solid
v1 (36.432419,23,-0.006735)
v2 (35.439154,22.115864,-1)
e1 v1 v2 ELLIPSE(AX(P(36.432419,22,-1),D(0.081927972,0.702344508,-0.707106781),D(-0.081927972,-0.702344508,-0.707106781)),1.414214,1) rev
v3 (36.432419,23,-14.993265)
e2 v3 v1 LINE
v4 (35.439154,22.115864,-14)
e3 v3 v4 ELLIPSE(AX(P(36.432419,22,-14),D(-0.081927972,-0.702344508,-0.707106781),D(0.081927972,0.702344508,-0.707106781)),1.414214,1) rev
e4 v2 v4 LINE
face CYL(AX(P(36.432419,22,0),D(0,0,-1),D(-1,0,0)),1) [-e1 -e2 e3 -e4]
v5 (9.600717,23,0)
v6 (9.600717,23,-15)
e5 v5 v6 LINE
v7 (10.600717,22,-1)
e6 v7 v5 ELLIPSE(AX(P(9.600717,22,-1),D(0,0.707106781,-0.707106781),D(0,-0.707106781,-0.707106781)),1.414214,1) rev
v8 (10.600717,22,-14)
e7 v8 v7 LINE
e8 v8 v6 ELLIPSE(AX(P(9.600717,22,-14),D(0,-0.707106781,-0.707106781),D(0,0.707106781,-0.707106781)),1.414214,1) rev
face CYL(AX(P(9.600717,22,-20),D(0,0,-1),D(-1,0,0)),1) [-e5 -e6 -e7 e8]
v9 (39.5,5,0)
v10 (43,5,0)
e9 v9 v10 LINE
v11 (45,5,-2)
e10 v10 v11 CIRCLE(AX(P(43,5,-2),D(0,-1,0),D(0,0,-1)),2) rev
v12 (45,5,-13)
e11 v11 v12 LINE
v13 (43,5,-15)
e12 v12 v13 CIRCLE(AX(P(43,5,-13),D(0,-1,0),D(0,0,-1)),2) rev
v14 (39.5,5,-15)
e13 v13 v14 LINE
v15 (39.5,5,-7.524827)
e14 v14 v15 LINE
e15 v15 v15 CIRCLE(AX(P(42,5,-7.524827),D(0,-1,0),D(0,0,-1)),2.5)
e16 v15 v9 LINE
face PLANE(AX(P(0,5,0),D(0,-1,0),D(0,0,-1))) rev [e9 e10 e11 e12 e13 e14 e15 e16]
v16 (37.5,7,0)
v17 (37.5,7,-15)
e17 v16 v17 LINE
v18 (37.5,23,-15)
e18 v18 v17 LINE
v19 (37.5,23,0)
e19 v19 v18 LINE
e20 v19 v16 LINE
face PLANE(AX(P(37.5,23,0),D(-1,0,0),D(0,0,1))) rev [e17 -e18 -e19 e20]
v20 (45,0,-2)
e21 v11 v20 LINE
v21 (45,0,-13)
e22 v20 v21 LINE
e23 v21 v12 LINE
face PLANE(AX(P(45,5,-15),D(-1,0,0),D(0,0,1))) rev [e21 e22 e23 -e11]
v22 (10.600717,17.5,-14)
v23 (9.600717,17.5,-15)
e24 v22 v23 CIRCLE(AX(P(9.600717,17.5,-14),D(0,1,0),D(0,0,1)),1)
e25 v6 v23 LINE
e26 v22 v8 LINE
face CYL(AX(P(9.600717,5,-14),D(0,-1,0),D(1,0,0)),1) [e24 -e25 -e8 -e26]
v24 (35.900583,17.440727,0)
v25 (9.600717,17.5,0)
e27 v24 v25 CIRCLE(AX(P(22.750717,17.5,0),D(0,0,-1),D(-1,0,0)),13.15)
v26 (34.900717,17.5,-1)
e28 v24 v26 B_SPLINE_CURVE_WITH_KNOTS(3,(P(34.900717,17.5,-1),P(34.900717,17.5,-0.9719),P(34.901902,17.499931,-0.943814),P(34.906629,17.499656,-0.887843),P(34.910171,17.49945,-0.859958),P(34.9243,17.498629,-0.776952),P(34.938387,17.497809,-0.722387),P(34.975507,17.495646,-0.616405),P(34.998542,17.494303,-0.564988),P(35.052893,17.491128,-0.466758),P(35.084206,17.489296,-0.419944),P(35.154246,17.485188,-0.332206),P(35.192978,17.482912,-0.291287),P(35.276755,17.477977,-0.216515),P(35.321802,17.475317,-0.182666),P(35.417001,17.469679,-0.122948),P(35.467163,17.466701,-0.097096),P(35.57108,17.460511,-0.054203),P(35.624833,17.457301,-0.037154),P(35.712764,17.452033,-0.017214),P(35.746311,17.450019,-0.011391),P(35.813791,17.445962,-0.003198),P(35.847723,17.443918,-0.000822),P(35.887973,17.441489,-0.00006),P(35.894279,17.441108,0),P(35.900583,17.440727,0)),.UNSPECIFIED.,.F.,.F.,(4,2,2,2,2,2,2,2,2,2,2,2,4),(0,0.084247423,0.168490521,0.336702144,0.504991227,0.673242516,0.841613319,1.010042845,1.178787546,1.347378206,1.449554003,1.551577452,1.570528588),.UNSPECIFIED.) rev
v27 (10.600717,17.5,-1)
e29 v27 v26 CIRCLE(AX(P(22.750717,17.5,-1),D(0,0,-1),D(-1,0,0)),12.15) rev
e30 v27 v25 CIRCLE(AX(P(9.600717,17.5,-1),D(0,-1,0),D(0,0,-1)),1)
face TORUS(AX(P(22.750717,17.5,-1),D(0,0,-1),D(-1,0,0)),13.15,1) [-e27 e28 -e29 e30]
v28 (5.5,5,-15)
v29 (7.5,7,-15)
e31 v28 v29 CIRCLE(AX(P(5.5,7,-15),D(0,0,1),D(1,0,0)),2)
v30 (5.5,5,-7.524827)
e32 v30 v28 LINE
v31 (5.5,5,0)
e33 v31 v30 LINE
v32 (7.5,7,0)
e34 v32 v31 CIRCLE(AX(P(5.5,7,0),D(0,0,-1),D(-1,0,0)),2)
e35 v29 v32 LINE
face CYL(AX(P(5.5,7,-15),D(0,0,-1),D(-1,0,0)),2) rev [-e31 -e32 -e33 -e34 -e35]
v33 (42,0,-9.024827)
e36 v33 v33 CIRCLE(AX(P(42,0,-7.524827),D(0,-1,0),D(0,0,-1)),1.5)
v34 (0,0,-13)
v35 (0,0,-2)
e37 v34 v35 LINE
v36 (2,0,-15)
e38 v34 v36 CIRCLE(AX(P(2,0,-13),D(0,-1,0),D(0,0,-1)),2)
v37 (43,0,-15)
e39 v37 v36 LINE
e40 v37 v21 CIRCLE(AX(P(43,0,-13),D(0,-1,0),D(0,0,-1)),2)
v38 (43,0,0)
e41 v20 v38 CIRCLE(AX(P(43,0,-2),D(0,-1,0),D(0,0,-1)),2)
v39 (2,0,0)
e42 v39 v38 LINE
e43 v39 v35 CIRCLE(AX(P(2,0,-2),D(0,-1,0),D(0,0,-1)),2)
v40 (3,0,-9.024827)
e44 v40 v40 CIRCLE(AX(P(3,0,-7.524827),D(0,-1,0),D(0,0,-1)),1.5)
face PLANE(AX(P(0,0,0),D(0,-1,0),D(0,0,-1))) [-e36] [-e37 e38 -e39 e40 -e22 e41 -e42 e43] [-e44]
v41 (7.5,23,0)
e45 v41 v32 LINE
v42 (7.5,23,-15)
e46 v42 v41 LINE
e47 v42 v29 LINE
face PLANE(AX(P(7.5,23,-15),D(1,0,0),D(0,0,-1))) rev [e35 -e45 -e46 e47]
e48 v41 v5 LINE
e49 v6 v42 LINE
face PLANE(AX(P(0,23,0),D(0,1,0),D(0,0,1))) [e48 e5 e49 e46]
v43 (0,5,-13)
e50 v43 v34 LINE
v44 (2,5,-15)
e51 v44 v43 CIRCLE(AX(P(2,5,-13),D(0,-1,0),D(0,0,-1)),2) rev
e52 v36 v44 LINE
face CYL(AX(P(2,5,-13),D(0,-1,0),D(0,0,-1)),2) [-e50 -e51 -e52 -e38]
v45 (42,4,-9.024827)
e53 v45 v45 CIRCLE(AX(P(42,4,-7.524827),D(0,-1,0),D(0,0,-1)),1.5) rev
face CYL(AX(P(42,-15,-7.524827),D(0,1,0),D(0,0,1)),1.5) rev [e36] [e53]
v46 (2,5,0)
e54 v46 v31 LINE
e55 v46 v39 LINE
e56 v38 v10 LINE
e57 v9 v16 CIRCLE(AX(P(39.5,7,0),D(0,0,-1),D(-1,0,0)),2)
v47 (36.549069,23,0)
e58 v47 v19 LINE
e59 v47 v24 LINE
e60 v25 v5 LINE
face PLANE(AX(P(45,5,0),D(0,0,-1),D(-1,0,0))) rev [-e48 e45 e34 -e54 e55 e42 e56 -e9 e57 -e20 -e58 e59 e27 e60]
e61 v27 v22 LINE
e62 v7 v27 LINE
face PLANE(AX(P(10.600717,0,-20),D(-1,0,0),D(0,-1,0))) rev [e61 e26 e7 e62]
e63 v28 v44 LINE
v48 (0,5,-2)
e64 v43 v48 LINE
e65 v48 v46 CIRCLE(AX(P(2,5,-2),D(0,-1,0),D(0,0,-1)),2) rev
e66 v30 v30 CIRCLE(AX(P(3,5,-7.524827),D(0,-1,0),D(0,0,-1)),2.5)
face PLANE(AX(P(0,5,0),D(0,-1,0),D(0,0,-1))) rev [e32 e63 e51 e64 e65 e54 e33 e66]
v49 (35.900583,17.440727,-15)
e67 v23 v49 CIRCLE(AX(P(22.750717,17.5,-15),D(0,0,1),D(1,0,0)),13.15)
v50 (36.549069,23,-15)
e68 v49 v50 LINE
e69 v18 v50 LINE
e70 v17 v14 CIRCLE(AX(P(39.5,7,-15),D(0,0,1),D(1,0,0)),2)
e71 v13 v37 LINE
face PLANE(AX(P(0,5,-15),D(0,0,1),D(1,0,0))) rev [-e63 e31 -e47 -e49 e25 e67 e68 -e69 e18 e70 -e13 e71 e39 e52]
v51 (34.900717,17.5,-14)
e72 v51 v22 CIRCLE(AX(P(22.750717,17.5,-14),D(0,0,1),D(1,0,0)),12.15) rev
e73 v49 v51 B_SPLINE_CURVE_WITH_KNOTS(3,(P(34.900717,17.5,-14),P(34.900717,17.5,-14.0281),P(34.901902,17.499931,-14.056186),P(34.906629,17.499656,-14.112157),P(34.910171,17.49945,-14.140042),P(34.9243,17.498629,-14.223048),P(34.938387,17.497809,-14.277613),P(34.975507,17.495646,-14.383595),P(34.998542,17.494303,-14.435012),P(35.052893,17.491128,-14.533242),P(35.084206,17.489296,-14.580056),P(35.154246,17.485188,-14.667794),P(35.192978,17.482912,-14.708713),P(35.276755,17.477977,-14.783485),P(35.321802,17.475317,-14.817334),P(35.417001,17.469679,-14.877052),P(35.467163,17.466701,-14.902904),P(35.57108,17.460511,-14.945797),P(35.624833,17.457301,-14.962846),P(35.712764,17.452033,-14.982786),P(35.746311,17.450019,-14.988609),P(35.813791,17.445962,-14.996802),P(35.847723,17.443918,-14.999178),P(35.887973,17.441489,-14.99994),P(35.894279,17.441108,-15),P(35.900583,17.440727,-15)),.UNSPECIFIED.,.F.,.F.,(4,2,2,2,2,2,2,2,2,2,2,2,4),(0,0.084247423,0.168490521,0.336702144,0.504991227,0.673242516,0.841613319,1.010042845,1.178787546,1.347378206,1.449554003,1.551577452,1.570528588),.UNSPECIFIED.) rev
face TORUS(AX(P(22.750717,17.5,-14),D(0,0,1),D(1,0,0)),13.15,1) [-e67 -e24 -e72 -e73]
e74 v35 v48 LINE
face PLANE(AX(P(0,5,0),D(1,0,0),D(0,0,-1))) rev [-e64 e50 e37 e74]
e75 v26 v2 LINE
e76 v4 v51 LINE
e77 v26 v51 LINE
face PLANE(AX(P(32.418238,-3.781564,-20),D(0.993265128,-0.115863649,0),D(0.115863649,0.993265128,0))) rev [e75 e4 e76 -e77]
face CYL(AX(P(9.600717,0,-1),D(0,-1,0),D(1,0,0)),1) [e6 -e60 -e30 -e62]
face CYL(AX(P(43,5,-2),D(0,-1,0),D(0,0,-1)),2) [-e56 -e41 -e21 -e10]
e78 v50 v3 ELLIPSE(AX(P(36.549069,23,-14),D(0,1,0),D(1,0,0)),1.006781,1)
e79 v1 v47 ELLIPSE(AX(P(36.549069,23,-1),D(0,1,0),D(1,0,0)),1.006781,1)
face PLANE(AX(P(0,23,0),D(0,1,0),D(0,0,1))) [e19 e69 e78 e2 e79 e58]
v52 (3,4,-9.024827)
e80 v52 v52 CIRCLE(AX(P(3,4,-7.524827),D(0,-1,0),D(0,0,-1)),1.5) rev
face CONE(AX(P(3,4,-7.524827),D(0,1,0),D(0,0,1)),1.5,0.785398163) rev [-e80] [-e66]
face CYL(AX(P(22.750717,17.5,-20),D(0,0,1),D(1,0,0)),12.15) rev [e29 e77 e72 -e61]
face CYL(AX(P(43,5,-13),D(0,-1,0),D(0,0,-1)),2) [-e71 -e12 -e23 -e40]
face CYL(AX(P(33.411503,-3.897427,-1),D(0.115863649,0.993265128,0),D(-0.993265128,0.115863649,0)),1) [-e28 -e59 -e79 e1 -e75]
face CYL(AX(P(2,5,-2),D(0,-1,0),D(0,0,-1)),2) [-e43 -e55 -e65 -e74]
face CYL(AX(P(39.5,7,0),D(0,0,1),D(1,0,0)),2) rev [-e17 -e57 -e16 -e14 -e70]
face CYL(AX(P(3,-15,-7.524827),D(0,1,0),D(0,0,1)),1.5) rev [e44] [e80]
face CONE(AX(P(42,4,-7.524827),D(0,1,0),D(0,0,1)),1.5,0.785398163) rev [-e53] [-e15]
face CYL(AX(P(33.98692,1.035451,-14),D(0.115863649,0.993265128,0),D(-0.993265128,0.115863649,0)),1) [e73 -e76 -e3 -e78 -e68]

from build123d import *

# Parameters (mm, degrees)
SKETCH1_W           = 45
SKETCH1_H           = 15
BOSS_EXTRUDE1_DEPTH = 5
SKETCH2_W           = 30
SKETCH2_H           = 15
BOSS_EXTRUDE2_DEPTH = 18
FILLET1_R           = 2
SKETCH3_R           = 1.5
CUT_EXTRUDE1_DEPTH  = 20
CHAMFER1_SIZE       = 1
CUT_EXTRUDE2_DEPTH  = 20
CUT_EXTRUDE3_DEPTH  = 20
FILLET2_R           = 1


with BuildPart() as part:
    # Sketch1 → Boss-Extrude1 (new body)
    with BuildSketch(Plane(origin=(0, 0, 0), x_dir=(1, 0, 0), z_dir=(0, 1, 0))):
        with Locations((22.5, 7.5)):
            Rectangle(SKETCH1_W, SKETCH1_H)
    extrude(amount=BOSS_EXTRUDE1_DEPTH)

    # Sketch2 → Boss-Extrude2 (add)
    with BuildSketch(Plane(origin=(0, 5, 0), x_dir=(1, 0, 0), z_dir=(0, 1, 0))):
        with Locations((22.5, 7.5)):
            Rectangle(SKETCH2_W, SKETCH2_H)
    extrude(amount=BOSS_EXTRUDE2_DEPTH)

    # Fillet1
    fillet1_edges = [part.edges().sort_by_distance(p)[0] for p in [
        (7.5, 5, -7.5),
        (37.5, 5, -7.5),
        (0, 2.5, 0),
        (0, 2.5, -15),
        (45, 2.5, -15),
        (45, 2.5, 0),
    ]]
    fillet(fillet1_edges, radius=FILLET1_R)

    # Sketch3 → Cut-Extrude1 (cut)
    with BuildSketch(Plane(origin=(0, 5, 0), x_dir=(1, 0, 0), z_dir=(0, 1, 0))):
        with Locations(Location((3, 7.524826623, 0), (0, 0, 270))):
            Circle(SKETCH3_R)
        with Locations(Location((42, 7.524826623, 0), (0, 0, 270))):
            Circle(SKETCH3_R)
    extrude(amount=-CUT_EXTRUDE1_DEPTH, mode=Mode.SUBTRACT)

    # Chamfer1
    chamfer1_edges = [part.edges().sort_by_distance(p)[0] for p in [
        (3, 5, -9.024826623),
        (42, 5, -9.024826623),
    ]]
    chamfer(chamfer1_edges, length=CHAMFER1_SIZE - 0.0001)  # a hair under: the kernel refuses the full size

    # Sketch4 → Cut-Extrude2 (cut)
    with BuildSketch(Plane.XY):
        with BuildLine():
            Line((11.916858064, 23), (33.584575987, 23))
            ThreePointArc((33.584575987, 23), (22.750717026, 5.35), (11.916858064, 23))
        make_face()
    extrude(amount=-CUT_EXTRUDE2_DEPTH, mode=Mode.SUBTRACT)

    # Sketch6 → Cut-Extrude3 (cut)
    with BuildSketch(Plane.XY):
        with BuildLine():
            ThreePointArc((33.584575987, 23), (34.567101549, 20.327641563), (34.900717026, 17.5))
            Line((34.900717026, 17.5), (35.542287994, 23))
            Line((35.542287994, 23), (33.584575987, 23))
        make_face()
        with BuildLine():
            Line((10.600717026, 23), (10.600717026, 17.5))
            ThreePointArc((10.600717026, 17.5), (10.934332503, 20.327641563), (11.916858064, 23))
            Line((11.916858064, 23), (10.600717026, 23))
        make_face()
    extrude(amount=-CUT_EXTRUDE3_DEPTH, mode=Mode.SUBTRACT)

    # Fillet2
    fillet2_edges = [part.edges().sort_by_distance(p)[0] for p in [
        (22.750717026, 5.35, 0),
        (22.750717026, 5.35, -15),
        (35.22150251, 20.25, -15),
        (35.542287994, 23, -7.5),
        (35.22150251, 20.25, 0),
        (10.600717026, 23, -7.5),
        (10.600717026, 20.25, -15),
        (10.600717026, 20.25, 0),
    ]]
    fillet(fillet2_edges, radius=FILLET2_R)


solid = part.part
